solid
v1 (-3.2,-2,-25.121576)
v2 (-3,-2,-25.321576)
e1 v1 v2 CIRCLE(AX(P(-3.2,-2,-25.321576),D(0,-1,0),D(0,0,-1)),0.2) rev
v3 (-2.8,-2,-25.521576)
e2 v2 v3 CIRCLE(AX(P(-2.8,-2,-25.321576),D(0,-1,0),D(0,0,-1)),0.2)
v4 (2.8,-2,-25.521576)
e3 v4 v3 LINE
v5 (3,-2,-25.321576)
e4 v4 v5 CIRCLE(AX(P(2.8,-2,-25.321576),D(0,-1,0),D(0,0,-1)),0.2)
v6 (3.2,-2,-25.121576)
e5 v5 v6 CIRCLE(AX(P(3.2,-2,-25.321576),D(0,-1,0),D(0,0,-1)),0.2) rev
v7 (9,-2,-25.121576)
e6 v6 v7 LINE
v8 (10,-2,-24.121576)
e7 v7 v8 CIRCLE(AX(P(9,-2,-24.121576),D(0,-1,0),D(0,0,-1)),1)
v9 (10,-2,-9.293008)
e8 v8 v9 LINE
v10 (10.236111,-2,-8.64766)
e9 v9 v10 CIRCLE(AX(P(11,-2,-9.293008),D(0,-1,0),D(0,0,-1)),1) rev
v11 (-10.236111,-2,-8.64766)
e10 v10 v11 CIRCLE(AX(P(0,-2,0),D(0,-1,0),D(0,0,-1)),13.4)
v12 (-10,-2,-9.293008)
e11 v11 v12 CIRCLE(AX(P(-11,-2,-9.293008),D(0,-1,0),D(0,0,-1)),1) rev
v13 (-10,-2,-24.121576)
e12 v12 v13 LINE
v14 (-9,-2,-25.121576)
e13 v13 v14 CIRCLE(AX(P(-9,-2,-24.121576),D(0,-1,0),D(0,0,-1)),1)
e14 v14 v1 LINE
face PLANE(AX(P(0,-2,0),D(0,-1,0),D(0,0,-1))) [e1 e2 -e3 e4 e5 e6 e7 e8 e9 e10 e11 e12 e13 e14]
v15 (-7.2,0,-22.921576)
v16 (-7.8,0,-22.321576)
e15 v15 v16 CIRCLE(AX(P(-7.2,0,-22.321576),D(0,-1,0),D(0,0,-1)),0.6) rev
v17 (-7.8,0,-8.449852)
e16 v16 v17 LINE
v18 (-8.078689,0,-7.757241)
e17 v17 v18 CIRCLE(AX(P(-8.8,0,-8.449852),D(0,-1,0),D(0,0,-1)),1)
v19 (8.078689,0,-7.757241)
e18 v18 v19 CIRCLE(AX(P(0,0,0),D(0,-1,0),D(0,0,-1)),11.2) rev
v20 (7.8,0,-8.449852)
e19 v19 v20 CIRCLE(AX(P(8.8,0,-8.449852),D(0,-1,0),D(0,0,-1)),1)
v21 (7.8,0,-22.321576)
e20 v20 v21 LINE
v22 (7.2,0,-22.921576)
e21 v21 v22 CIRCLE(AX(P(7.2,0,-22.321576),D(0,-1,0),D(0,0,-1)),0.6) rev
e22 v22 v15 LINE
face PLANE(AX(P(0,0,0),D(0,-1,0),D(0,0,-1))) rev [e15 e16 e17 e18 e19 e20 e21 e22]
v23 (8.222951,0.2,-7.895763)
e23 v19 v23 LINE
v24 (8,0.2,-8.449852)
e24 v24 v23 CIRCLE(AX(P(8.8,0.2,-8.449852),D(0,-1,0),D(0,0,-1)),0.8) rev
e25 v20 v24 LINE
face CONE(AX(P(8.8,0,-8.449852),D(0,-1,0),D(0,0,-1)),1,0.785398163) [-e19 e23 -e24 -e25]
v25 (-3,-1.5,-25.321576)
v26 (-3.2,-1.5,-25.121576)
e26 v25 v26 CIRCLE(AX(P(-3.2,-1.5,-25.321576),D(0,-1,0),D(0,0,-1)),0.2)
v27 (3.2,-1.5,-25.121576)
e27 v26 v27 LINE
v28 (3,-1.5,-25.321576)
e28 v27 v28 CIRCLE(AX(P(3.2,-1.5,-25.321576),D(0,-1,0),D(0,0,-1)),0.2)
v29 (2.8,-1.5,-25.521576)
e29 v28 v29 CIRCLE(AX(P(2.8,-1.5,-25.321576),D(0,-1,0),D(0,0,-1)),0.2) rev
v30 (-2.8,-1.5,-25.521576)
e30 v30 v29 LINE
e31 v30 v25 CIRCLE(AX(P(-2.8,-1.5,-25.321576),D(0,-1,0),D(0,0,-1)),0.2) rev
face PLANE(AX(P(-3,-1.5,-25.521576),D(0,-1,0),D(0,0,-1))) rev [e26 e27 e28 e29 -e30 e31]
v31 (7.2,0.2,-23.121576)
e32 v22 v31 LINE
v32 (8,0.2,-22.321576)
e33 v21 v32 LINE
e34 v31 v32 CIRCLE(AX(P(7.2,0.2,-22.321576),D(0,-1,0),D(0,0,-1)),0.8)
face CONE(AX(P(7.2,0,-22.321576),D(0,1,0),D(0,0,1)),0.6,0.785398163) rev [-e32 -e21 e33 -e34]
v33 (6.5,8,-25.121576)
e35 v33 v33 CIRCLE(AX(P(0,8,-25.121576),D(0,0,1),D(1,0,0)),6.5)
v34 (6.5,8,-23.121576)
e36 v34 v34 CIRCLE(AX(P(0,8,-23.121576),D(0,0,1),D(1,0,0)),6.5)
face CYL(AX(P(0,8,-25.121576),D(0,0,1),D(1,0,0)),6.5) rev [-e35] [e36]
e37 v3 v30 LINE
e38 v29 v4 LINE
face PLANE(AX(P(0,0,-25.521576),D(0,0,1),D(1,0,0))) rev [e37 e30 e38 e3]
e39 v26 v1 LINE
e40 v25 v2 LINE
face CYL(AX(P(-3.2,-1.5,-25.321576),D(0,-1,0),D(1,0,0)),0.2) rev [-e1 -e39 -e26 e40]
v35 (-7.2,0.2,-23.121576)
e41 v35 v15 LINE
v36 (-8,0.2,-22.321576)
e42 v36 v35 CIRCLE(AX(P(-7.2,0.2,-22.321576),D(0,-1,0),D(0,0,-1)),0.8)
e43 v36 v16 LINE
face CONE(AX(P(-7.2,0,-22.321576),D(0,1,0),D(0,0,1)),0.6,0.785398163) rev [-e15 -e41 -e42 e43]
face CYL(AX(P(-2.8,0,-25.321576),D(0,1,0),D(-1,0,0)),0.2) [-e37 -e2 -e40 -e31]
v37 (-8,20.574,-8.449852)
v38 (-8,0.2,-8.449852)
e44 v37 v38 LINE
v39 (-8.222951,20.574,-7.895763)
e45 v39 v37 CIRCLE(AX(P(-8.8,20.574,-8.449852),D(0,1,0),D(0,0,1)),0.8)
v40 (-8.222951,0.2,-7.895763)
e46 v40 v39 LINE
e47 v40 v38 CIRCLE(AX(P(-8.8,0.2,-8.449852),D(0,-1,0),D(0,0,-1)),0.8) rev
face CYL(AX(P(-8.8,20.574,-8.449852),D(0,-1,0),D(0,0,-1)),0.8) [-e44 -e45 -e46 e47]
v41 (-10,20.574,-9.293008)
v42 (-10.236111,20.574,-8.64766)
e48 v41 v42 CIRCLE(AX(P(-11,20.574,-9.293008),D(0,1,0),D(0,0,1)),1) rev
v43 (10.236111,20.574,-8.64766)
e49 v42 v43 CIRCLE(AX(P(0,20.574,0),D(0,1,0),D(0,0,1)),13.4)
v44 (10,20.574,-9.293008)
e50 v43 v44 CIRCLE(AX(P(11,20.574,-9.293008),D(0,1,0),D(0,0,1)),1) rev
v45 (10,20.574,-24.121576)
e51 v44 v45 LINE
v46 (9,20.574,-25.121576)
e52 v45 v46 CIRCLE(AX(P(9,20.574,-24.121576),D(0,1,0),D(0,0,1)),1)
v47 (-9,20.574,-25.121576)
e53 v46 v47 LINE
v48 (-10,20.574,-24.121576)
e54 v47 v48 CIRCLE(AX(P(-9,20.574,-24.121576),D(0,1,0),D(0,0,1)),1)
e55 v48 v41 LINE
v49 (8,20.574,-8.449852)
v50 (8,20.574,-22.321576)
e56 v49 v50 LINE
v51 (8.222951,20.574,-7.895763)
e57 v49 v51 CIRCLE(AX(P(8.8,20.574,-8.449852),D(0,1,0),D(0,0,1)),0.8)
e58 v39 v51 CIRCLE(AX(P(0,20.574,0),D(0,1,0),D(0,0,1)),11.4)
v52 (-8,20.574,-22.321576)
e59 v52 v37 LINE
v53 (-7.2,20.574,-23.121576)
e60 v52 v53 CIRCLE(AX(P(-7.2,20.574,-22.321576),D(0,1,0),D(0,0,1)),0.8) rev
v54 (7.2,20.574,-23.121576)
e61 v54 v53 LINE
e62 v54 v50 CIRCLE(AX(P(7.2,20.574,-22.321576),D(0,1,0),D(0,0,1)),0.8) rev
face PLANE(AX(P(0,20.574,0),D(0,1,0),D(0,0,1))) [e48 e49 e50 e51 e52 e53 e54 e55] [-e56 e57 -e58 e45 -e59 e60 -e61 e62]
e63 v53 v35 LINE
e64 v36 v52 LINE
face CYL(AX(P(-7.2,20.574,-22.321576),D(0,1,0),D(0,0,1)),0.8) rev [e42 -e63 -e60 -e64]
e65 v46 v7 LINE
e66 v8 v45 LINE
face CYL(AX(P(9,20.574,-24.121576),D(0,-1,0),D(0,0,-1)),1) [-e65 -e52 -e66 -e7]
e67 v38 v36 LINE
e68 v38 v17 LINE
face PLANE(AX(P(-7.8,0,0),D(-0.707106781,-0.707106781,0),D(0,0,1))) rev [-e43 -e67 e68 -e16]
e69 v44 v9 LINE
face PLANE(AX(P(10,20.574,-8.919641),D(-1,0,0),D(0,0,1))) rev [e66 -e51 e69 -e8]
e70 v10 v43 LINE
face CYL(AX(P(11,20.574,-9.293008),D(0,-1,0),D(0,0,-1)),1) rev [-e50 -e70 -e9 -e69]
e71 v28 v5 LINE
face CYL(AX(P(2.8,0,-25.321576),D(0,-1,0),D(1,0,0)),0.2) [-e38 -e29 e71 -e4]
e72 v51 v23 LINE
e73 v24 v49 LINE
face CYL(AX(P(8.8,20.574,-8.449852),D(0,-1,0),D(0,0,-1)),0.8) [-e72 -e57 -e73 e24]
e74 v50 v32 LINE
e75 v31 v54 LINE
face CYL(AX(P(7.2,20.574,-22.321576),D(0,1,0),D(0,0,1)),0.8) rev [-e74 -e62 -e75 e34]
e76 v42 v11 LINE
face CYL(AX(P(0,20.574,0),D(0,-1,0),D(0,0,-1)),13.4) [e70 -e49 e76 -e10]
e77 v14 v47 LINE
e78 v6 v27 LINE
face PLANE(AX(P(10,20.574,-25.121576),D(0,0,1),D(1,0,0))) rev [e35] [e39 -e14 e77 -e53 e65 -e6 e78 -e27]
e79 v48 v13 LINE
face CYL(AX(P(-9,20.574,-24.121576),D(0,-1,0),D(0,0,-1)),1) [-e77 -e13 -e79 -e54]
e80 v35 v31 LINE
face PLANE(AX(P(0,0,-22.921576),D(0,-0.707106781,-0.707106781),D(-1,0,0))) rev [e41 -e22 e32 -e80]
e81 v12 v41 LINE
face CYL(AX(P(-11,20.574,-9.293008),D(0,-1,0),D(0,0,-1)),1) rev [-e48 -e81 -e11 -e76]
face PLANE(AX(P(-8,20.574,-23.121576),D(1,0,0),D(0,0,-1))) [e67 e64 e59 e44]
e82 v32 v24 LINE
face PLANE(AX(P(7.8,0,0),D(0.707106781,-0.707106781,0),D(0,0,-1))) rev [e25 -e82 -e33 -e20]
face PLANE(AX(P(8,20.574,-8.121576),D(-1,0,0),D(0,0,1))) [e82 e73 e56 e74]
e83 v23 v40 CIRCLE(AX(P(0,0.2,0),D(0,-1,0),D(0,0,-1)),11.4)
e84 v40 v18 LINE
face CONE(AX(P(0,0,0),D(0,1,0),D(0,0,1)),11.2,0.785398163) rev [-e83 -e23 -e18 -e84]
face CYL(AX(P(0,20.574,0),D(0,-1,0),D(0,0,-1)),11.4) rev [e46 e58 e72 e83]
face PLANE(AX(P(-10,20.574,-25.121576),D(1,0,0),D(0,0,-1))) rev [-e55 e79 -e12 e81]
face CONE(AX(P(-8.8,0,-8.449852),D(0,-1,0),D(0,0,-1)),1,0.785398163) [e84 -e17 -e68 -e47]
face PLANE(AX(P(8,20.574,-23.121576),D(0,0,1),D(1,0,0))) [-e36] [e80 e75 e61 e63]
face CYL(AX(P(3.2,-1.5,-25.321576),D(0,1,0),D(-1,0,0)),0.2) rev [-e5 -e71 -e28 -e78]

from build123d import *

# Parameters (mm, degrees)
BOSS_EXTRUDE1_DEPTH = 20.574
BOSS_EXTRUDE2_START = 2
BOSS_EXTRUDE2_DEPTH = 2
SKETCH3_R           = 6.5
CUT_EXTRUDE1_DEPTH  = 45.007669834
FILLET1_R           = 1
SKETCH4_W           = 6
SKETCH4_H           = 0.5
BOSS_EXTRUDE3_DEPTH = 0.4
FILLET2_START       = -3
FILLET2_DEPTH       = 2
FILLET2_START_2     = -2
FILLET2_2_DEPTH     = 0.5
FILLET3_R           = 0.8
CHAMFER1_SIZE       = 0.2


with BuildPart() as part:
    # Sketch1 → Boss-Extrude1 (new body)
    with BuildSketch(Plane(origin=(0, 0, 0), x_dir=(1, 0, 0), z_dir=(0, 1, 0))):
        with BuildLine():
            Line((10, 8.919641248), (10, 25.121576202))
            Line((10, 25.121576202), (-10, 25.121576202))
            Line((-10, 25.121576202), (-10, 8.919641248))
            ThreePointArc((-10, 8.919641248), (0, -13.4), (10, 8.919641248))
        make_face()
        with BuildLine():
            Line((-8, 23.121576202), (-8, 8.121576202))
            ThreePointArc((-8, 8.121576202), (0, -11.4), (8, 8.121576202))
            Line((8, 8.121576202), (8, 23.121576202))
            Line((8, 23.121576202), (-8, 23.121576202))
        make_face(mode=Mode.SUBTRACT)
    extrude(amount=BOSS_EXTRUDE1_DEPTH)

    # Sketch2 → Boss-Extrude2 (add)
    with BuildSketch(Plane.XZ.offset(BOSS_EXTRUDE2_START)):
        with BuildLine():
            Line((10, -8.919641248), (10, -25.121576202))
            Line((10, -25.121576202), (-10, -25.121576202))
            Line((-10, -25.121576202), (-10, -8.919641248))
            ThreePointArc((-10, -8.919641248), (0, 13.4), (10, -8.919641248))
        make_face()
    extrude(amount=-BOSS_EXTRUDE2_DEPTH)

    # Sketch3 → Cut-Extrude1 (cut, through all)
    with BuildSketch(Plane.XY.offset(-23.121576202)):
        with Locations((0, 8)):
            Circle(SKETCH3_R)
    extrude(amount=-CUT_EXTRUDE1_DEPTH, mode=Mode.SUBTRACT)

    # Fillet1
    fillet1_edges = [part.edges().sort_by_distance(p)[0] for p in [
        (-10, 9.287, -8.919641248),
        (-10, 9.287, -25.121576202),
        (10, 9.287, -25.121576202),
        (10, 9.287, -8.919641248),
    ]]
    fillet(fillet1_edges, radius=FILLET1_R)

    # Sketch4 → Boss-Extrude3 (add)
    with BuildSketch(Plane(origin=(0, 0, -25.121576202), x_dir=(-1, 0, 0), z_dir=(0, 0, -1))):
        with Locations((0, -1.75)):
            Rectangle(SKETCH4_W, SKETCH4_H)
    extrude(amount=BOSS_EXTRUDE3_DEPTH)

    # Fillet2: read off the stored shape, not the designer's step
    # Fillet2 outline → Fillet2 (cut)
    with BuildSketch(Plane(origin=(0, 0, 0), x_dir=(1, 0, 0), z_dir=(0, 1, 0)).offset(FILLET2_START)):
        with BuildLine():
            ThreePointArc((-3, 25.321576202), (-2.941421356, 25.462997558), (-2.8, 25.521576202))
            Line((-2.8, 25.521576202), (-3, 25.521576202))
            Line((-3, 25.521576202), (-3, 25.321576202))
        make_face()
        with BuildLine():
            Line((3, 25.521576202), (2.8, 25.521576202))
            ThreePointArc((2.8, 25.521576202), (2.941421356, 25.462997558), (3, 25.321576202))
            Line((3, 25.321576202), (3, 25.521576202))
        make_face()
    extrude(amount=FILLET2_DEPTH, mode=Mode.SUBTRACT)

    # Fillet2 2 outline → Fillet2 2 (add)
    with BuildSketch(Plane(origin=(0, 0, 0), x_dir=(1, 0, 0), z_dir=(0, 1, 0)).offset(FILLET2_START_2)):
        with BuildLine():
            Line((-3, 25.121576202), (-3, 25.321576202))
            ThreePointArc((-3, 25.321576202), (-3.058578644, 25.180154845), (-3.2, 25.121576202))
            Line((-3.2, 25.121576202), (-3, 25.121576202))
        make_face()
        with BuildLine():
            ThreePointArc((3.2, 25.121576202), (3.058578644, 25.180154845), (3, 25.321576202))
            Line((3, 25.321576202), (3, 25.121576202))
            Line((3, 25.121576202), (3.2, 25.121576202))
        make_face()
    extrude(amount=FILLET2_2_DEPTH)

    # Fillet3
    fillet3_edges = [part.edges().sort_by_distance(p)[0] for p in [
        (8, 10.287, -23.121576202),
        (-8, 10.287, -23.121576202),
        (-8, 10.287, -8.121576202),
        (8, 10.287, -8.121576202),
    ]]
    fillet(fillet3_edges, radius=FILLET3_R)

    # Chamfer1
    chamfer1_edges = [part.edges().sort_by_distance(p)[0] for p in [
        (8, 0, -15.385714136),
        (0, 0, -23.121576202),
        (-8, 0, -15.385714136),
        (0, 0, 11.4),
        (-7.765685425, 0, -22.887261627),
        (7.765685425, 0, -22.887261627),
        (8.057827734, 0, -8.151221315),
        (-8.057827734, 0, -8.151221315),
    ]]
    chamfer(chamfer1_edges, length=CHAMFER1_SIZE)


solid = part.part
